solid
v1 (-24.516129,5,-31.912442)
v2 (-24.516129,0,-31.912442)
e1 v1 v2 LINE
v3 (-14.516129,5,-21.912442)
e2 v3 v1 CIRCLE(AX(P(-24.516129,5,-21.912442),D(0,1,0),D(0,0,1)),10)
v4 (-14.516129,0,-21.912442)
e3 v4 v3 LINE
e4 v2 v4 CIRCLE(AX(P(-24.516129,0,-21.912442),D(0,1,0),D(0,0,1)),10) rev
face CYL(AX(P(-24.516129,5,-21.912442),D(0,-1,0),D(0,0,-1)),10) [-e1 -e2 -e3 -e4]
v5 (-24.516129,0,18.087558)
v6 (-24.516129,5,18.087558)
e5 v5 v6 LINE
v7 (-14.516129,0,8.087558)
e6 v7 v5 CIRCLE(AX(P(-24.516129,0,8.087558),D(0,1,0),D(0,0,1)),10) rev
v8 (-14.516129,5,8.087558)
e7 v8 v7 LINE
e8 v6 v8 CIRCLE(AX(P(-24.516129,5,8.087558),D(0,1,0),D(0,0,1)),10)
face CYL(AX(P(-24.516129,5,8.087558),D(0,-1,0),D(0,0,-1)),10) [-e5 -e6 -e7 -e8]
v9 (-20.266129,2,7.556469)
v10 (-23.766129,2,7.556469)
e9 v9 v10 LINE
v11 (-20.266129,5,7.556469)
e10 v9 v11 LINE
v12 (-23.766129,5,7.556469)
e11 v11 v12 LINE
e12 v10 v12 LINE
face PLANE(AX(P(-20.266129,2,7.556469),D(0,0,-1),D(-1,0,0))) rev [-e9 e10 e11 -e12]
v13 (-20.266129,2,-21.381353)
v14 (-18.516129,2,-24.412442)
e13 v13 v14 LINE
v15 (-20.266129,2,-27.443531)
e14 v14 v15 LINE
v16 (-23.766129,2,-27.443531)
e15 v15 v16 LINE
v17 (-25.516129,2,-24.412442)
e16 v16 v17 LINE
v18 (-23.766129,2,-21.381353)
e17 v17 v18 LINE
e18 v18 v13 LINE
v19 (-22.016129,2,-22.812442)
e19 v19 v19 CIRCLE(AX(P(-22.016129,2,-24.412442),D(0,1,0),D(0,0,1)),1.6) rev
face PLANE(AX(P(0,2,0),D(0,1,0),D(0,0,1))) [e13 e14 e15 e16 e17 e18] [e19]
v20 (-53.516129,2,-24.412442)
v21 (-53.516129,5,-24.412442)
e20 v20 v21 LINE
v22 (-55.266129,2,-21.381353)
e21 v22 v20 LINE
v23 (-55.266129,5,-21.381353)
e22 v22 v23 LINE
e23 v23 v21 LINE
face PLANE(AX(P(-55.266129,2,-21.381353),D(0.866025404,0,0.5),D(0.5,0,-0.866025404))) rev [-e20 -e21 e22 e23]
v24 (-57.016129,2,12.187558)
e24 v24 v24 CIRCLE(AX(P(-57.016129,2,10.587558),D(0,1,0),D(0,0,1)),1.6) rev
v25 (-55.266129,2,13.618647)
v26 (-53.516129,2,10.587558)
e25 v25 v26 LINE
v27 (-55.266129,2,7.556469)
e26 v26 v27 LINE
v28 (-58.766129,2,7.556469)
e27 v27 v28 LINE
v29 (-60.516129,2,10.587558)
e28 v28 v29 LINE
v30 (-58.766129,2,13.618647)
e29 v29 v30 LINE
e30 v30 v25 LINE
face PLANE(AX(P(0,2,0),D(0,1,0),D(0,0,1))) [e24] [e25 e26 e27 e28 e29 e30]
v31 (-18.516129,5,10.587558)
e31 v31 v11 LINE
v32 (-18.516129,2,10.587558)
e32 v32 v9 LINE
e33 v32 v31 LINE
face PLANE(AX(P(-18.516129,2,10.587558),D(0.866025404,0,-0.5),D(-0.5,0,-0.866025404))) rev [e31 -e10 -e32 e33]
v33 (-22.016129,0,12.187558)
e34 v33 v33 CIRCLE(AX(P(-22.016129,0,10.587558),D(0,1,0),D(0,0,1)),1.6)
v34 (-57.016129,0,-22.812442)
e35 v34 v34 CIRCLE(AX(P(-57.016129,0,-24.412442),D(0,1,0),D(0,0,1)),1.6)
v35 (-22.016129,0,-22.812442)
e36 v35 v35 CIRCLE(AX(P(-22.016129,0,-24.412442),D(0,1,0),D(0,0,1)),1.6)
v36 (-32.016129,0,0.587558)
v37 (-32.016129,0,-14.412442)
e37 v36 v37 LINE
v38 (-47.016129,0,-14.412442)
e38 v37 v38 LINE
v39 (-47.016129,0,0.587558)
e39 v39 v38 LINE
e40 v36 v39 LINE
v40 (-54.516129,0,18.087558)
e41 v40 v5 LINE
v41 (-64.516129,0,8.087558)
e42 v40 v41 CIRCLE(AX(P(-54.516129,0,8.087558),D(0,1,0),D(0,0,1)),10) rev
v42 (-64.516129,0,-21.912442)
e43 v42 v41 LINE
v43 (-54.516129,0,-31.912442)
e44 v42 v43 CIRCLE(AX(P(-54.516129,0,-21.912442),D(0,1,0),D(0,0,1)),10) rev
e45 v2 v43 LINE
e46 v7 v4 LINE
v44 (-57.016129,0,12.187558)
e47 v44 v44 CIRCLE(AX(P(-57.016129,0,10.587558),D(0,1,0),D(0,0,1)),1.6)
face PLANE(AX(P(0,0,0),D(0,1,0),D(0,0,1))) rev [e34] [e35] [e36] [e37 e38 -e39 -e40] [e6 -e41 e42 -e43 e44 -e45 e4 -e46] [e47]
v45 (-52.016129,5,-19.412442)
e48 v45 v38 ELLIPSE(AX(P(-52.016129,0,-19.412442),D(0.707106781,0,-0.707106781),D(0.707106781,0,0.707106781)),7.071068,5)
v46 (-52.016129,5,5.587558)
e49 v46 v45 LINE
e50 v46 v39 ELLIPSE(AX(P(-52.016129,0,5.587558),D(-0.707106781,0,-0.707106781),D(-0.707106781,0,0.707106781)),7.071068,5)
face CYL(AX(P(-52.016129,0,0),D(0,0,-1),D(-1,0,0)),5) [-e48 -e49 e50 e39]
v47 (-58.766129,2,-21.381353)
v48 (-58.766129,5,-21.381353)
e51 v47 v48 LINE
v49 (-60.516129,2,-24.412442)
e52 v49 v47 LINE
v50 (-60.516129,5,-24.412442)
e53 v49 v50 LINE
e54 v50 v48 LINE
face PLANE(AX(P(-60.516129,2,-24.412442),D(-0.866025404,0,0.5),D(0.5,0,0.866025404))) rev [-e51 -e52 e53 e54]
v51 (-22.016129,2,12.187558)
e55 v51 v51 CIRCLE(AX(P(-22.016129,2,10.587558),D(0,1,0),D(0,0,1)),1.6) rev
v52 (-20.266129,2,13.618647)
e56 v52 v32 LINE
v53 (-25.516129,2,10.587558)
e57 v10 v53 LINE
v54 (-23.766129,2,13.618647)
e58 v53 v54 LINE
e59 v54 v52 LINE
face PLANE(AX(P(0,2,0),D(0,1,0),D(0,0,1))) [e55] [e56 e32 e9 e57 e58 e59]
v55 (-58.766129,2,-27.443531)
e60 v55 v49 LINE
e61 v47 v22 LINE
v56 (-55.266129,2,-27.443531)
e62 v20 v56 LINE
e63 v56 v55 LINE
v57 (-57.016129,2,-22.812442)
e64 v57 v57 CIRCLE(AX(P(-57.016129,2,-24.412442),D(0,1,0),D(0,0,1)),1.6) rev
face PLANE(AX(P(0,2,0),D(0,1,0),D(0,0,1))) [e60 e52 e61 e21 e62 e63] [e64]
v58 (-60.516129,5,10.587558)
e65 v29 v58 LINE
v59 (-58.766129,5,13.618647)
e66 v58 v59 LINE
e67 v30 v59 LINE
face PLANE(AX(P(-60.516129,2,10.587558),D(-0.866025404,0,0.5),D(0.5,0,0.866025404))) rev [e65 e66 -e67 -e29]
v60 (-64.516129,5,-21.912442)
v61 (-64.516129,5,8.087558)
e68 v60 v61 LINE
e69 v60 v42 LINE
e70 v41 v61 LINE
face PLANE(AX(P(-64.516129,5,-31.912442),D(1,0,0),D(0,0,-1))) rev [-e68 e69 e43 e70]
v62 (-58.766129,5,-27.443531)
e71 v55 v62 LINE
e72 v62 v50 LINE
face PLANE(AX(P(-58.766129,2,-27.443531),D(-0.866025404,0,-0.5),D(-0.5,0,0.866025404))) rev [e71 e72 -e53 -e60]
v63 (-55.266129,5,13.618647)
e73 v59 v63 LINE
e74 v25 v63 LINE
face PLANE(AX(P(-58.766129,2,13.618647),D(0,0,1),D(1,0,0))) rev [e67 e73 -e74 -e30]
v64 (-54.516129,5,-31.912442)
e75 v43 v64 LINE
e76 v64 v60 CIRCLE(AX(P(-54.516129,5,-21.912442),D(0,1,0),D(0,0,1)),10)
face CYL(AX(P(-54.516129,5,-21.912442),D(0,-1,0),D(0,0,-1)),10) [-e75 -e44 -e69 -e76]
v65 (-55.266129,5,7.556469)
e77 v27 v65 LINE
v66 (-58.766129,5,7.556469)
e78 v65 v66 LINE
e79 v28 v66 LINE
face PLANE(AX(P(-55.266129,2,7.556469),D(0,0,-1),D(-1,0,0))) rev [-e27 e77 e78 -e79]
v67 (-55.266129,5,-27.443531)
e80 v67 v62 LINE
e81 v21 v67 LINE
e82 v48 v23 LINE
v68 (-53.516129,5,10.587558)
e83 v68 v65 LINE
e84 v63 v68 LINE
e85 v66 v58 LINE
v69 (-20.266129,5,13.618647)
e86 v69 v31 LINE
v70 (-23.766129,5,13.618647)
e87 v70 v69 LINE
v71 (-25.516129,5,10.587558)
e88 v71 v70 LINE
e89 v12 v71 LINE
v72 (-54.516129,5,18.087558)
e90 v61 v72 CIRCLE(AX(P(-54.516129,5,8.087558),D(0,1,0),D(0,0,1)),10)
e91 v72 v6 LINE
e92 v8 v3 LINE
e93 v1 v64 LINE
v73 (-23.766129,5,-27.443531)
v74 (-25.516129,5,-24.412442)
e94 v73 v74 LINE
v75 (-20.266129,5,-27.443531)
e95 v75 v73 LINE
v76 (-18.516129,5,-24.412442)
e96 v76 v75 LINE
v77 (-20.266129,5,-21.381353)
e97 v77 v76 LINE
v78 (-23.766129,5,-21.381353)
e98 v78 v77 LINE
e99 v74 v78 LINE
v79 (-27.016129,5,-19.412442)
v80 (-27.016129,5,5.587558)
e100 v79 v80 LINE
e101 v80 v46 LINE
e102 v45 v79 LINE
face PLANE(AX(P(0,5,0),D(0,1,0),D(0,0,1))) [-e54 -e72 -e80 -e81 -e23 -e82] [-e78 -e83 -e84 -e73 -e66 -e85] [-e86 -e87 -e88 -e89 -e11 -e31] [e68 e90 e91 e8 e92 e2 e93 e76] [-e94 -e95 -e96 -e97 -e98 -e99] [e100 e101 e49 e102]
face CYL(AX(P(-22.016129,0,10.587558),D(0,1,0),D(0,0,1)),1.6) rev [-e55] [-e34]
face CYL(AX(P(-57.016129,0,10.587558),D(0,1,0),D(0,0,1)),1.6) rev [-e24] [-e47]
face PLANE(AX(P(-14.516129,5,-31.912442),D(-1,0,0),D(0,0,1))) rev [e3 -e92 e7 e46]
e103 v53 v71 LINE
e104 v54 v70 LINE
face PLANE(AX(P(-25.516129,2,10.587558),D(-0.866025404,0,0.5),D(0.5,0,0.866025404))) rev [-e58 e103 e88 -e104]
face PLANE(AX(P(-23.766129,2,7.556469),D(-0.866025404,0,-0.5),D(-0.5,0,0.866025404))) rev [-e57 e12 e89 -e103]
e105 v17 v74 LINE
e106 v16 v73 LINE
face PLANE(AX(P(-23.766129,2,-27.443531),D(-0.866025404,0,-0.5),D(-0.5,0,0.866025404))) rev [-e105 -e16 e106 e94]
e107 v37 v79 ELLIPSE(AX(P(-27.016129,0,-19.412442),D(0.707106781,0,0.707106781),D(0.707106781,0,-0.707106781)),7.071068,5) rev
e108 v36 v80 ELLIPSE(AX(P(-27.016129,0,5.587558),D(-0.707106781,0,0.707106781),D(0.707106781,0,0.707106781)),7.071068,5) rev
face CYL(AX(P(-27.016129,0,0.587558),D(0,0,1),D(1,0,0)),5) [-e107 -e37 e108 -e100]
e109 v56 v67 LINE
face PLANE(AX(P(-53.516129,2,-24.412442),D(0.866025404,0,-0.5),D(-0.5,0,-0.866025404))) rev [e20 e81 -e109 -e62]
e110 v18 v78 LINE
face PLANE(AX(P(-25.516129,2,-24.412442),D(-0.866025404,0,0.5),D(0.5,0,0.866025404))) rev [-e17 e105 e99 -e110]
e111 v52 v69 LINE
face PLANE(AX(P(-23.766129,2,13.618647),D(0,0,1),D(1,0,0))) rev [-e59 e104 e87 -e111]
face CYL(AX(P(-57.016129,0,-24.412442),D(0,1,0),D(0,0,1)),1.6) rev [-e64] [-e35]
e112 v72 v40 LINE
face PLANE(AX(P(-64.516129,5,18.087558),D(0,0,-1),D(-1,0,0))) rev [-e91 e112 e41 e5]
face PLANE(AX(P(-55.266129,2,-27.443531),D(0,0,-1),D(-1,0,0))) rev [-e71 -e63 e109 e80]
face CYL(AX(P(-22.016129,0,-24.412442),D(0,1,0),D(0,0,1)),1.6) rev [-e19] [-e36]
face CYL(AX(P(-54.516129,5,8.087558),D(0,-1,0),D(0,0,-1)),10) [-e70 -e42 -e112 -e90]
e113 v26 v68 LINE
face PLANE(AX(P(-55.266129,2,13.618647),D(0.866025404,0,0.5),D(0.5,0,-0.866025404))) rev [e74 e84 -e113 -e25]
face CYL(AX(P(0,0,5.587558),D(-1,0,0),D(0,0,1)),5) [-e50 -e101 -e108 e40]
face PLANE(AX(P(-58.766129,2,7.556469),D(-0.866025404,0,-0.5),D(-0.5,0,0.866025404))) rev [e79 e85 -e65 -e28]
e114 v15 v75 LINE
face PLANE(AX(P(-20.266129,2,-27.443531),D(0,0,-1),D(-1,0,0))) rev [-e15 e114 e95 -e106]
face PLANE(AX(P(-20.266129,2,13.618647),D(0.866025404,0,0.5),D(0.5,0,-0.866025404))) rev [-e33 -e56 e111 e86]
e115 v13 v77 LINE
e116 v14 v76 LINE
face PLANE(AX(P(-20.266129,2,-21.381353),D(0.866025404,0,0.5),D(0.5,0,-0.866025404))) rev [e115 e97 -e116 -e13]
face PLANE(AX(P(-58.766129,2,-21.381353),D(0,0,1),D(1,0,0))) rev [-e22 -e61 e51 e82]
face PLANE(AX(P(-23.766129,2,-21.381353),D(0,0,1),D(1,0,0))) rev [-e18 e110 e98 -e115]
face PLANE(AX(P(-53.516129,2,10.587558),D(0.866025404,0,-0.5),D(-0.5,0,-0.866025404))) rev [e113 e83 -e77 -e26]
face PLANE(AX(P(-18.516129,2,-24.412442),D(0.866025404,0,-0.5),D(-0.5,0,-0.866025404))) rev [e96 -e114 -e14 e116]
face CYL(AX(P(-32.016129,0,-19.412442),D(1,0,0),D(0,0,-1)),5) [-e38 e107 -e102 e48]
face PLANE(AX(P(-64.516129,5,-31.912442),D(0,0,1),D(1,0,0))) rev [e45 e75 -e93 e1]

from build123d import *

# Parameters (mm, degrees)
SKETCH1_W           = 50
SKETCH1_H           = 50
BOSS_EXTRUDE1_DEPTH = 5
SKETCH2_R           = 1.6
CUT_EXTRUDE1_DEPTH  = 5
SKETCH4_W           = 15
SKETCH4_H           = 15
CUT_EXTRUDE2_DEPTH  = 5
CUT_EXTRUDE3_DEPTH  = 3
FILLET2_R           = 10
FILLET3_R           = 5


with BuildPart() as part:
    # Sketch1 → Boss-Extrude1 (new body)
    with BuildSketch(Plane(origin=(0, 0, 0), x_dir=(1, 0, 0), z_dir=(0, 1, 0))):
        with Locations((-39.516129032, 6.912442396)):
            Rectangle(SKETCH1_W, SKETCH1_H)
    extrude(amount=BOSS_EXTRUDE1_DEPTH)

    # Sketch2 → Cut-Extrude1 (cut)
    with BuildSketch(Plane(origin=(0, 5, 0), x_dir=(1, 0, 0), z_dir=(0, 1, 0))):
        with Locations(Location((-57.016129032, 24.412442396, 0), (0, 0, 270))):
            Circle(SKETCH2_R)
        with Locations(Location((-22.016129032, 24.412442396, 0), (0, 0, 270))):
            Circle(SKETCH2_R)
        with Locations(Location((-57.016129032, -10.587557604, 0), (0, 0, 270))):
            Circle(SKETCH2_R)
        with Locations(Location((-22.016129032, -10.587557604, 0), (0, 0, 270))):
            Circle(SKETCH2_R)
    extrude(amount=-CUT_EXTRUDE1_DEPTH, mode=Mode.SUBTRACT)

    # Sketch4 → Cut-Extrude2 (cut)
    with BuildSketch(Plane(origin=(0, 5, 0), x_dir=(1, 0, 0), z_dir=(0, 1, 0))):
        with Locations((-39.516129032, 6.912442396)):
            Rectangle(SKETCH4_W, SKETCH4_H)
    extrude(amount=-CUT_EXTRUDE2_DEPTH, mode=Mode.SUBTRACT)

    # Sketch5 → Cut-Extrude3 (cut)
    with BuildSketch(Plane(origin=(0, 5, 0), x_dir=(1, 0, 0), z_dir=(0, 1, 0))):
        Polygon((-58.766129032, 27.44353131), (-60.516129032, 24.412442396), (-58.766129032, 21.381353483), (-55.266129032, 21.381353483), (-53.516129032, 24.412442396), (-55.266129032, 27.44353131), align=None)
        Polygon((-23.766129032, 27.44353131), (-25.516129032, 24.412442396), (-23.766129032, 21.381353483), (-20.266129032, 21.381353483), (-18.516129032, 24.412442396), (-20.266129032, 27.44353131), align=None)
        Polygon((-58.766129032, -7.55646869), (-60.516129032, -10.587557604), (-58.766129032, -13.618646517), (-55.266129032, -13.618646517), (-53.516129032, -10.587557604), (-55.266129032, -7.55646869), align=None)
        Polygon((-23.766129032, -7.55646869), (-25.516129032, -10.587557604), (-23.766129032, -13.618646517), (-20.266129032, -13.618646517), (-18.516129032, -10.587557604), (-20.266129032, -7.55646869), align=None)
    extrude(amount=-CUT_EXTRUDE3_DEPTH, mode=Mode.SUBTRACT)

    # Fillet2
    fillet2_edges = [part.edges().sort_by_distance(p)[0] for p in [
        (-64.516129032, 2.5, -31.912442396),
        (-14.516129032, 2.5, -31.912442396),
        (-14.516129032, 2.5, 18.087557604),
        (-64.516129032, 2.5, 18.087557604),
    ]]
    fillet(fillet2_edges, radius=FILLET2_R)

    # Fillet3
    fillet3_edges = [part.edges().sort_by_distance(p)[0] for p in [
        (-39.516129032, 5, -14.412442396),
        (-32.016129032, 5, -6.912442396),
        (-39.516129032, 5, 0.587557604),
        (-47.016129032, 5, -6.912442396),
    ]]
    fillet(fillet3_edges, radius=FILLET3_R - 0.0001)  # a hair under: the kernel refuses the full size


solid = part.part
